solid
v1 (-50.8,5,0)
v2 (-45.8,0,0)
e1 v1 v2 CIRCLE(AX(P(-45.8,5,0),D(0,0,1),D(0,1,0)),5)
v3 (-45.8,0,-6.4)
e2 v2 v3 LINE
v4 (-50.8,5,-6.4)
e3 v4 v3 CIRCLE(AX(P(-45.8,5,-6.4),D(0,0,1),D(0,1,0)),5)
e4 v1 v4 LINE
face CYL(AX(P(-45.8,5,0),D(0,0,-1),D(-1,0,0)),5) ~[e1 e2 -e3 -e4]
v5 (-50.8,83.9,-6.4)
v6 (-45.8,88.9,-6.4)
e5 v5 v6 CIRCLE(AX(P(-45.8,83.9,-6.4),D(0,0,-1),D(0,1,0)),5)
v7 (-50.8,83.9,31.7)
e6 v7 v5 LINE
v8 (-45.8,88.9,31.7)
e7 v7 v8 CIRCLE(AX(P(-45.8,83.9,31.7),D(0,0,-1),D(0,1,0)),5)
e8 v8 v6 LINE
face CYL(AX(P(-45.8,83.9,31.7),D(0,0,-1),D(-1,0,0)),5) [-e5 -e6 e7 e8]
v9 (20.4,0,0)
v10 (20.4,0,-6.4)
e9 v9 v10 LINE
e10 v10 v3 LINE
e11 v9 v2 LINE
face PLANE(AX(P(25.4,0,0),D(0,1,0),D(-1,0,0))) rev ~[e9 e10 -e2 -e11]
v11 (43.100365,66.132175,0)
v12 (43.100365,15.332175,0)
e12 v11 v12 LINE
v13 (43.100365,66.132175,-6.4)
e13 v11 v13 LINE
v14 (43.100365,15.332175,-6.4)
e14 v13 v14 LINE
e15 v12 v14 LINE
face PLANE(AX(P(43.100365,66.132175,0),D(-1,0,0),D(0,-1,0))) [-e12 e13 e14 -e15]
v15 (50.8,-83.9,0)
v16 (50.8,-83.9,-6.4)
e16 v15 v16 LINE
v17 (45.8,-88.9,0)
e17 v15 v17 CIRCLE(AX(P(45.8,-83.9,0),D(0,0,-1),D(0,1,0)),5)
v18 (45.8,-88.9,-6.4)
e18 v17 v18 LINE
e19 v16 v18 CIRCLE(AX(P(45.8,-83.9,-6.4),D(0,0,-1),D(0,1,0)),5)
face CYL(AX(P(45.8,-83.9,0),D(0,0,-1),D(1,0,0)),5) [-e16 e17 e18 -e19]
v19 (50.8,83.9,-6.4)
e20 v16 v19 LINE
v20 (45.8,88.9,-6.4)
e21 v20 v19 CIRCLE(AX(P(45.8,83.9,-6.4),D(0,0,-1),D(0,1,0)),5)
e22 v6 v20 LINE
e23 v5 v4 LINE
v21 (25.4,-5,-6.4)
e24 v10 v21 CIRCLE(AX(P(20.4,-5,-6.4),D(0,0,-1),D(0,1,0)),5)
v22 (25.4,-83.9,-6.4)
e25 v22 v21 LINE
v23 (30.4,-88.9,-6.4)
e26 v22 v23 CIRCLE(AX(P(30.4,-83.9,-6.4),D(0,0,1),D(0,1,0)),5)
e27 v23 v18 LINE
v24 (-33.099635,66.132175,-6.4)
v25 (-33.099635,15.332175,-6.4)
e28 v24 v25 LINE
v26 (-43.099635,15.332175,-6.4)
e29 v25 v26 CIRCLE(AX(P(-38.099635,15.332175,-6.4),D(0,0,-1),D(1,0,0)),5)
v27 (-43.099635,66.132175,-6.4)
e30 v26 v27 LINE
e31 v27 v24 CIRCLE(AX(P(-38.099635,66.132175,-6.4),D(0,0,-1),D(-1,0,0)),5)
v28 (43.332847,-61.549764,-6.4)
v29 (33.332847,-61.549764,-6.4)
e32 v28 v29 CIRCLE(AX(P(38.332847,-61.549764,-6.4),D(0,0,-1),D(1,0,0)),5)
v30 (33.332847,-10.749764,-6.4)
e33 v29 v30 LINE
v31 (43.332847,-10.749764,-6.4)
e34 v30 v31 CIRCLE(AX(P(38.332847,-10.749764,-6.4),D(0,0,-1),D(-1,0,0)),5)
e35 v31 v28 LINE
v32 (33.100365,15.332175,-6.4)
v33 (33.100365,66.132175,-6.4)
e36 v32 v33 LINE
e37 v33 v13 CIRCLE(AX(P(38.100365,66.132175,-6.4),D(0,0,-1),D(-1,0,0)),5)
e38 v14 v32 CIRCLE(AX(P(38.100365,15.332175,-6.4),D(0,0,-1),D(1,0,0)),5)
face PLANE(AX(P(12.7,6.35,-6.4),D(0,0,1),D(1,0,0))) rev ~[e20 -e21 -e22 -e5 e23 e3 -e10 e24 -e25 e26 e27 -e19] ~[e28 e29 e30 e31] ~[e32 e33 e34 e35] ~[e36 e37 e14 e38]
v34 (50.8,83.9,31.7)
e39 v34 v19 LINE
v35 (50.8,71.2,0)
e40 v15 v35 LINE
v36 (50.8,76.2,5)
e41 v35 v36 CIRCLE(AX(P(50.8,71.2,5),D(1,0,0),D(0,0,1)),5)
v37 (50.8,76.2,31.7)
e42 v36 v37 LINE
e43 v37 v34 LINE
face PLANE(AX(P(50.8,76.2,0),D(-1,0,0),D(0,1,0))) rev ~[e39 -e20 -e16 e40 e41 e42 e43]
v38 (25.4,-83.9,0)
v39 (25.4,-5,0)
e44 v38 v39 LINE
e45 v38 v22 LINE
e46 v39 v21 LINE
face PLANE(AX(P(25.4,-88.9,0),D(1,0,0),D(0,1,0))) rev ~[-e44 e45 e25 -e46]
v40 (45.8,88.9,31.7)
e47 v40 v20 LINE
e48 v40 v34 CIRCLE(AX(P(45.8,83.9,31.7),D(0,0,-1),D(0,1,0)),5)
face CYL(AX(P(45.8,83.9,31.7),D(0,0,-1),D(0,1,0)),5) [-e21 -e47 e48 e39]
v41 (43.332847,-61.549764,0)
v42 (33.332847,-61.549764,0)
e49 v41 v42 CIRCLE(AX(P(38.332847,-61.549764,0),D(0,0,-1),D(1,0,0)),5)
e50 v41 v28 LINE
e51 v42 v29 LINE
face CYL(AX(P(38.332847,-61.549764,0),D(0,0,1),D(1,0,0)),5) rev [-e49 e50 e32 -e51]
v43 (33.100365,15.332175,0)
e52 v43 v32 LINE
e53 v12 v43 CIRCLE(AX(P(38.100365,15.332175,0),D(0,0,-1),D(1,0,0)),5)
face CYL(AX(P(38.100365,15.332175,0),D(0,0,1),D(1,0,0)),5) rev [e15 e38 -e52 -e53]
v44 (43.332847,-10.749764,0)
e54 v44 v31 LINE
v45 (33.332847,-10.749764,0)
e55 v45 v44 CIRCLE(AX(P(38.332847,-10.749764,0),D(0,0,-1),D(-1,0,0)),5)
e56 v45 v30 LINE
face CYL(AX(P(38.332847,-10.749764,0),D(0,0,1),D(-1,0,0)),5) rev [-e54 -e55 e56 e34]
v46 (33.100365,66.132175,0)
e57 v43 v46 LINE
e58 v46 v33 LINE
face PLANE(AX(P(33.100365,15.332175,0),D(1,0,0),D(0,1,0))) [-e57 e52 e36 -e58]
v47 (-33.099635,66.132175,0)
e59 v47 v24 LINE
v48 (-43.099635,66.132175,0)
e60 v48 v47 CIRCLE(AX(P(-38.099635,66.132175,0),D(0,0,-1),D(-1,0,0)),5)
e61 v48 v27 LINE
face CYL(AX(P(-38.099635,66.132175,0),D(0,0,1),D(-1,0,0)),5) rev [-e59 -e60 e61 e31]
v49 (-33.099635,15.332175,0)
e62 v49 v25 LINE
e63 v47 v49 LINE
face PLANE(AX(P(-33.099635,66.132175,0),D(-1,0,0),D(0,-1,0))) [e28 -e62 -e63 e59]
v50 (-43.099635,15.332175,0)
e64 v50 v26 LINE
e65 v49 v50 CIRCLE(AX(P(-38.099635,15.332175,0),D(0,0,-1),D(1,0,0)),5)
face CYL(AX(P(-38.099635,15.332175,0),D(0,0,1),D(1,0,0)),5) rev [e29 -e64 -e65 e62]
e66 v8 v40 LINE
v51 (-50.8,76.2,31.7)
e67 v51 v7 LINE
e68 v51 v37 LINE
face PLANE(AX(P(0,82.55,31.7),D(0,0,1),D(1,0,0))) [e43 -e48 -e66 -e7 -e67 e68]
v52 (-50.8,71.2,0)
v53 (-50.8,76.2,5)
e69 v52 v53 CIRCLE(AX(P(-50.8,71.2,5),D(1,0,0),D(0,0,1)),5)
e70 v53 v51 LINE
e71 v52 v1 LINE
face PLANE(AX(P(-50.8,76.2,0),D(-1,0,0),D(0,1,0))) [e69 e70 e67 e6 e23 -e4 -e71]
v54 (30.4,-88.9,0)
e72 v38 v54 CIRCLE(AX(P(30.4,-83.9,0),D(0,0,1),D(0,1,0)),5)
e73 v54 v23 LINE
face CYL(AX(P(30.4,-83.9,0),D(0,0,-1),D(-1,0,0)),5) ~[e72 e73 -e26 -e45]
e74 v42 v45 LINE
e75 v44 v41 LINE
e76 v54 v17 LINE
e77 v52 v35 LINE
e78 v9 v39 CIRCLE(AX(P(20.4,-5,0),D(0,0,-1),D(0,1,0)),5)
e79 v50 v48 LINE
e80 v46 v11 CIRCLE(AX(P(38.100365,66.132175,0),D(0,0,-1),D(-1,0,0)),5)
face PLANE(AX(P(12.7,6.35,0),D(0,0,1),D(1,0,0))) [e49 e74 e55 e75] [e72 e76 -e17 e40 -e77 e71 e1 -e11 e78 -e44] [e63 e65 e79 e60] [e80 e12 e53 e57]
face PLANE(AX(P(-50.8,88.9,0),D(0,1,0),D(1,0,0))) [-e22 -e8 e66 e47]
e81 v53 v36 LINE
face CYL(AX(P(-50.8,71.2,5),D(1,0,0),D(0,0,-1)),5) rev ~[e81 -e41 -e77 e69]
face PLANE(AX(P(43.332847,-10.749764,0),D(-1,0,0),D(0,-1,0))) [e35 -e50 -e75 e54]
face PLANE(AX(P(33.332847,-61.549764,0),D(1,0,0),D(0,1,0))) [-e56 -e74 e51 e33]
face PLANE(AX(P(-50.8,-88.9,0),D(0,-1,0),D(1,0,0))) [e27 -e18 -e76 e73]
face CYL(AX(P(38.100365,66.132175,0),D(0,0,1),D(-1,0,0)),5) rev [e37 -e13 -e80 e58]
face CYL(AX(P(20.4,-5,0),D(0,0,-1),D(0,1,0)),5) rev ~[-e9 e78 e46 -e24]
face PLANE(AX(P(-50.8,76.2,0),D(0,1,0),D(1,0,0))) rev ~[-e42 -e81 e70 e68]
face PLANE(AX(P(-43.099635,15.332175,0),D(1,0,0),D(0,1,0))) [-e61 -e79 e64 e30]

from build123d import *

# Parameters (mm, degrees)
F0_W     = 101.6
F0_H     = 12.7
F1_DEPTH = 6.4
F2_DEPTH = 31.7
F3_DEPTH = 6.4
F4_R     = 5


with BuildPart() as f1:
    # F0 (on Top) → F1 (new body)
    with BuildSketch(Plane.XY):
        Polygon((25.4, -88.9), (50.8, -88.9), (50.8, -10.7497644231), (50.8, 76.2), (-50.8, 76.2), (-50.8, 0), (25.4, 0), align=None)
        with BuildLine():
            ThreePointArc((33.3328473049, -10.7497644231), (38.3328473049, -5.7497644231), (43.3328473049, -10.7497644231))
            Line((43.3328473049, -10.7497644231), (43.3328473049, -61.5497644231))
            ThreePointArc((43.3328473049, -61.5497644231), (38.3328473049, -66.5497644231), (33.3328473049, -61.5497644231))
            Line((33.3328473049, -61.5497644231), (33.3328473049, -10.7497644231))
        make_face(mode=Mode.SUBTRACT)
        with BuildLine():
            Line((-33.0996350241, 66.1321754187), (-33.0996350241, 15.3321754187))
            ThreePointArc((-33.0996350241, 15.3321754187), (-38.0996350241, 10.3321754187), (-43.0996350241, 15.3321754187))
            Line((-43.0996350241, 15.3321754187), (-43.0996350241, 66.1321754187))
            ThreePointArc((-43.0996350241, 66.1321754187), (-38.0996350241, 71.1321754187), (-33.0996350241, 66.1321754187))
        make_face(mode=Mode.SUBTRACT)
        with BuildLine():
            Line((43.1003649759, 66.1321754187), (43.1003649759, 15.3321754187))
            ThreePointArc((43.1003649759, 15.3321754187), (38.1003649759, 10.3321754187), (33.1003649759, 15.3321754187))
            Line((33.1003649759, 15.3321754187), (33.1003649759, 66.1321754187))
            ThreePointArc((33.1003649759, 66.1321754187), (38.1003649759, 71.1321754187), (43.1003649759, 66.1321754187))
        make_face(mode=Mode.SUBTRACT)
        Polygon((-25.4, -88.9), (25.4, -88.9), (25.4, 0), (-50.8, 0), (-50.8, -10.0678245813), (-50.8, -88.9), align=None)
        with BuildLine():
            Line((-43.0996350241, -60.8678127293), (-43.0996350241, -10.0678245813))
            ThreePointArc((-43.0996350241, -10.0678245813), (-38.0822904681, -5.0678546647), (-33.0997553575, -10.1025134845))
            Line((-33.0997553575, -10.1025134845), (-33.0996350241, -60.8678127293))
            ThreePointArc((-33.0996350241, -60.8678127293), (-38.0996350241, -65.8678127293), (-43.0996350241, -60.8678127293))
        make_face(mode=Mode.SUBTRACT)
        with Locations((0, 82.55)):
            Rectangle(F0_W, F0_H)
    extrude(amount=-F1_DEPTH)

    # F0 (on Top) → F2 (join)
    with BuildSketch(Plane.XY):
        with Locations((0, 82.55)):
            Rectangle(F0_W, F0_H)
    extrude(amount=F2_DEPTH)

    # F0 (on Top) → F3 (cut)
    with BuildSketch(Plane.XY):
        Polygon((-25.4, -88.9), (25.4, -88.9), (25.4, 0), (-50.8, 0), (-50.8, -10.0678245813), (-50.8, -88.9), align=None)
        with BuildLine():
            Line((-43.0996350241, -60.8678127293), (-43.0996350241, -10.0678245813))
            ThreePointArc((-43.0996350241, -10.0678245813), (-38.0822904681, -5.0678546647), (-33.0997553575, -10.1025134845))
            Line((-33.0997553575, -10.1025134845), (-33.0996350241, -60.8678127293))
            ThreePointArc((-33.0996350241, -60.8678127293), (-38.0996350241, -65.8678127293), (-43.0996350241, -60.8678127293))
        make_face(mode=Mode.SUBTRACT)
    extrude(amount=-F3_DEPTH, mode=Mode.SUBTRACT)

    # F4
    f4_edges = [f1.edges().sort_by_distance(p)[0] for p in [
        (0, 76.2, 0),
        (50.8, 88.9, 12.65),
        (-50.8, 88.9, 12.65),
        (25.4, -88.9, -3.2),
        (50.8, -88.9, -3.2),
        (25.4, 0, -3.2),
        (-50.8, 0, -3.2),
    ]]
    fillet(f4_edges, radius=F4_R)


solid = f1.part
